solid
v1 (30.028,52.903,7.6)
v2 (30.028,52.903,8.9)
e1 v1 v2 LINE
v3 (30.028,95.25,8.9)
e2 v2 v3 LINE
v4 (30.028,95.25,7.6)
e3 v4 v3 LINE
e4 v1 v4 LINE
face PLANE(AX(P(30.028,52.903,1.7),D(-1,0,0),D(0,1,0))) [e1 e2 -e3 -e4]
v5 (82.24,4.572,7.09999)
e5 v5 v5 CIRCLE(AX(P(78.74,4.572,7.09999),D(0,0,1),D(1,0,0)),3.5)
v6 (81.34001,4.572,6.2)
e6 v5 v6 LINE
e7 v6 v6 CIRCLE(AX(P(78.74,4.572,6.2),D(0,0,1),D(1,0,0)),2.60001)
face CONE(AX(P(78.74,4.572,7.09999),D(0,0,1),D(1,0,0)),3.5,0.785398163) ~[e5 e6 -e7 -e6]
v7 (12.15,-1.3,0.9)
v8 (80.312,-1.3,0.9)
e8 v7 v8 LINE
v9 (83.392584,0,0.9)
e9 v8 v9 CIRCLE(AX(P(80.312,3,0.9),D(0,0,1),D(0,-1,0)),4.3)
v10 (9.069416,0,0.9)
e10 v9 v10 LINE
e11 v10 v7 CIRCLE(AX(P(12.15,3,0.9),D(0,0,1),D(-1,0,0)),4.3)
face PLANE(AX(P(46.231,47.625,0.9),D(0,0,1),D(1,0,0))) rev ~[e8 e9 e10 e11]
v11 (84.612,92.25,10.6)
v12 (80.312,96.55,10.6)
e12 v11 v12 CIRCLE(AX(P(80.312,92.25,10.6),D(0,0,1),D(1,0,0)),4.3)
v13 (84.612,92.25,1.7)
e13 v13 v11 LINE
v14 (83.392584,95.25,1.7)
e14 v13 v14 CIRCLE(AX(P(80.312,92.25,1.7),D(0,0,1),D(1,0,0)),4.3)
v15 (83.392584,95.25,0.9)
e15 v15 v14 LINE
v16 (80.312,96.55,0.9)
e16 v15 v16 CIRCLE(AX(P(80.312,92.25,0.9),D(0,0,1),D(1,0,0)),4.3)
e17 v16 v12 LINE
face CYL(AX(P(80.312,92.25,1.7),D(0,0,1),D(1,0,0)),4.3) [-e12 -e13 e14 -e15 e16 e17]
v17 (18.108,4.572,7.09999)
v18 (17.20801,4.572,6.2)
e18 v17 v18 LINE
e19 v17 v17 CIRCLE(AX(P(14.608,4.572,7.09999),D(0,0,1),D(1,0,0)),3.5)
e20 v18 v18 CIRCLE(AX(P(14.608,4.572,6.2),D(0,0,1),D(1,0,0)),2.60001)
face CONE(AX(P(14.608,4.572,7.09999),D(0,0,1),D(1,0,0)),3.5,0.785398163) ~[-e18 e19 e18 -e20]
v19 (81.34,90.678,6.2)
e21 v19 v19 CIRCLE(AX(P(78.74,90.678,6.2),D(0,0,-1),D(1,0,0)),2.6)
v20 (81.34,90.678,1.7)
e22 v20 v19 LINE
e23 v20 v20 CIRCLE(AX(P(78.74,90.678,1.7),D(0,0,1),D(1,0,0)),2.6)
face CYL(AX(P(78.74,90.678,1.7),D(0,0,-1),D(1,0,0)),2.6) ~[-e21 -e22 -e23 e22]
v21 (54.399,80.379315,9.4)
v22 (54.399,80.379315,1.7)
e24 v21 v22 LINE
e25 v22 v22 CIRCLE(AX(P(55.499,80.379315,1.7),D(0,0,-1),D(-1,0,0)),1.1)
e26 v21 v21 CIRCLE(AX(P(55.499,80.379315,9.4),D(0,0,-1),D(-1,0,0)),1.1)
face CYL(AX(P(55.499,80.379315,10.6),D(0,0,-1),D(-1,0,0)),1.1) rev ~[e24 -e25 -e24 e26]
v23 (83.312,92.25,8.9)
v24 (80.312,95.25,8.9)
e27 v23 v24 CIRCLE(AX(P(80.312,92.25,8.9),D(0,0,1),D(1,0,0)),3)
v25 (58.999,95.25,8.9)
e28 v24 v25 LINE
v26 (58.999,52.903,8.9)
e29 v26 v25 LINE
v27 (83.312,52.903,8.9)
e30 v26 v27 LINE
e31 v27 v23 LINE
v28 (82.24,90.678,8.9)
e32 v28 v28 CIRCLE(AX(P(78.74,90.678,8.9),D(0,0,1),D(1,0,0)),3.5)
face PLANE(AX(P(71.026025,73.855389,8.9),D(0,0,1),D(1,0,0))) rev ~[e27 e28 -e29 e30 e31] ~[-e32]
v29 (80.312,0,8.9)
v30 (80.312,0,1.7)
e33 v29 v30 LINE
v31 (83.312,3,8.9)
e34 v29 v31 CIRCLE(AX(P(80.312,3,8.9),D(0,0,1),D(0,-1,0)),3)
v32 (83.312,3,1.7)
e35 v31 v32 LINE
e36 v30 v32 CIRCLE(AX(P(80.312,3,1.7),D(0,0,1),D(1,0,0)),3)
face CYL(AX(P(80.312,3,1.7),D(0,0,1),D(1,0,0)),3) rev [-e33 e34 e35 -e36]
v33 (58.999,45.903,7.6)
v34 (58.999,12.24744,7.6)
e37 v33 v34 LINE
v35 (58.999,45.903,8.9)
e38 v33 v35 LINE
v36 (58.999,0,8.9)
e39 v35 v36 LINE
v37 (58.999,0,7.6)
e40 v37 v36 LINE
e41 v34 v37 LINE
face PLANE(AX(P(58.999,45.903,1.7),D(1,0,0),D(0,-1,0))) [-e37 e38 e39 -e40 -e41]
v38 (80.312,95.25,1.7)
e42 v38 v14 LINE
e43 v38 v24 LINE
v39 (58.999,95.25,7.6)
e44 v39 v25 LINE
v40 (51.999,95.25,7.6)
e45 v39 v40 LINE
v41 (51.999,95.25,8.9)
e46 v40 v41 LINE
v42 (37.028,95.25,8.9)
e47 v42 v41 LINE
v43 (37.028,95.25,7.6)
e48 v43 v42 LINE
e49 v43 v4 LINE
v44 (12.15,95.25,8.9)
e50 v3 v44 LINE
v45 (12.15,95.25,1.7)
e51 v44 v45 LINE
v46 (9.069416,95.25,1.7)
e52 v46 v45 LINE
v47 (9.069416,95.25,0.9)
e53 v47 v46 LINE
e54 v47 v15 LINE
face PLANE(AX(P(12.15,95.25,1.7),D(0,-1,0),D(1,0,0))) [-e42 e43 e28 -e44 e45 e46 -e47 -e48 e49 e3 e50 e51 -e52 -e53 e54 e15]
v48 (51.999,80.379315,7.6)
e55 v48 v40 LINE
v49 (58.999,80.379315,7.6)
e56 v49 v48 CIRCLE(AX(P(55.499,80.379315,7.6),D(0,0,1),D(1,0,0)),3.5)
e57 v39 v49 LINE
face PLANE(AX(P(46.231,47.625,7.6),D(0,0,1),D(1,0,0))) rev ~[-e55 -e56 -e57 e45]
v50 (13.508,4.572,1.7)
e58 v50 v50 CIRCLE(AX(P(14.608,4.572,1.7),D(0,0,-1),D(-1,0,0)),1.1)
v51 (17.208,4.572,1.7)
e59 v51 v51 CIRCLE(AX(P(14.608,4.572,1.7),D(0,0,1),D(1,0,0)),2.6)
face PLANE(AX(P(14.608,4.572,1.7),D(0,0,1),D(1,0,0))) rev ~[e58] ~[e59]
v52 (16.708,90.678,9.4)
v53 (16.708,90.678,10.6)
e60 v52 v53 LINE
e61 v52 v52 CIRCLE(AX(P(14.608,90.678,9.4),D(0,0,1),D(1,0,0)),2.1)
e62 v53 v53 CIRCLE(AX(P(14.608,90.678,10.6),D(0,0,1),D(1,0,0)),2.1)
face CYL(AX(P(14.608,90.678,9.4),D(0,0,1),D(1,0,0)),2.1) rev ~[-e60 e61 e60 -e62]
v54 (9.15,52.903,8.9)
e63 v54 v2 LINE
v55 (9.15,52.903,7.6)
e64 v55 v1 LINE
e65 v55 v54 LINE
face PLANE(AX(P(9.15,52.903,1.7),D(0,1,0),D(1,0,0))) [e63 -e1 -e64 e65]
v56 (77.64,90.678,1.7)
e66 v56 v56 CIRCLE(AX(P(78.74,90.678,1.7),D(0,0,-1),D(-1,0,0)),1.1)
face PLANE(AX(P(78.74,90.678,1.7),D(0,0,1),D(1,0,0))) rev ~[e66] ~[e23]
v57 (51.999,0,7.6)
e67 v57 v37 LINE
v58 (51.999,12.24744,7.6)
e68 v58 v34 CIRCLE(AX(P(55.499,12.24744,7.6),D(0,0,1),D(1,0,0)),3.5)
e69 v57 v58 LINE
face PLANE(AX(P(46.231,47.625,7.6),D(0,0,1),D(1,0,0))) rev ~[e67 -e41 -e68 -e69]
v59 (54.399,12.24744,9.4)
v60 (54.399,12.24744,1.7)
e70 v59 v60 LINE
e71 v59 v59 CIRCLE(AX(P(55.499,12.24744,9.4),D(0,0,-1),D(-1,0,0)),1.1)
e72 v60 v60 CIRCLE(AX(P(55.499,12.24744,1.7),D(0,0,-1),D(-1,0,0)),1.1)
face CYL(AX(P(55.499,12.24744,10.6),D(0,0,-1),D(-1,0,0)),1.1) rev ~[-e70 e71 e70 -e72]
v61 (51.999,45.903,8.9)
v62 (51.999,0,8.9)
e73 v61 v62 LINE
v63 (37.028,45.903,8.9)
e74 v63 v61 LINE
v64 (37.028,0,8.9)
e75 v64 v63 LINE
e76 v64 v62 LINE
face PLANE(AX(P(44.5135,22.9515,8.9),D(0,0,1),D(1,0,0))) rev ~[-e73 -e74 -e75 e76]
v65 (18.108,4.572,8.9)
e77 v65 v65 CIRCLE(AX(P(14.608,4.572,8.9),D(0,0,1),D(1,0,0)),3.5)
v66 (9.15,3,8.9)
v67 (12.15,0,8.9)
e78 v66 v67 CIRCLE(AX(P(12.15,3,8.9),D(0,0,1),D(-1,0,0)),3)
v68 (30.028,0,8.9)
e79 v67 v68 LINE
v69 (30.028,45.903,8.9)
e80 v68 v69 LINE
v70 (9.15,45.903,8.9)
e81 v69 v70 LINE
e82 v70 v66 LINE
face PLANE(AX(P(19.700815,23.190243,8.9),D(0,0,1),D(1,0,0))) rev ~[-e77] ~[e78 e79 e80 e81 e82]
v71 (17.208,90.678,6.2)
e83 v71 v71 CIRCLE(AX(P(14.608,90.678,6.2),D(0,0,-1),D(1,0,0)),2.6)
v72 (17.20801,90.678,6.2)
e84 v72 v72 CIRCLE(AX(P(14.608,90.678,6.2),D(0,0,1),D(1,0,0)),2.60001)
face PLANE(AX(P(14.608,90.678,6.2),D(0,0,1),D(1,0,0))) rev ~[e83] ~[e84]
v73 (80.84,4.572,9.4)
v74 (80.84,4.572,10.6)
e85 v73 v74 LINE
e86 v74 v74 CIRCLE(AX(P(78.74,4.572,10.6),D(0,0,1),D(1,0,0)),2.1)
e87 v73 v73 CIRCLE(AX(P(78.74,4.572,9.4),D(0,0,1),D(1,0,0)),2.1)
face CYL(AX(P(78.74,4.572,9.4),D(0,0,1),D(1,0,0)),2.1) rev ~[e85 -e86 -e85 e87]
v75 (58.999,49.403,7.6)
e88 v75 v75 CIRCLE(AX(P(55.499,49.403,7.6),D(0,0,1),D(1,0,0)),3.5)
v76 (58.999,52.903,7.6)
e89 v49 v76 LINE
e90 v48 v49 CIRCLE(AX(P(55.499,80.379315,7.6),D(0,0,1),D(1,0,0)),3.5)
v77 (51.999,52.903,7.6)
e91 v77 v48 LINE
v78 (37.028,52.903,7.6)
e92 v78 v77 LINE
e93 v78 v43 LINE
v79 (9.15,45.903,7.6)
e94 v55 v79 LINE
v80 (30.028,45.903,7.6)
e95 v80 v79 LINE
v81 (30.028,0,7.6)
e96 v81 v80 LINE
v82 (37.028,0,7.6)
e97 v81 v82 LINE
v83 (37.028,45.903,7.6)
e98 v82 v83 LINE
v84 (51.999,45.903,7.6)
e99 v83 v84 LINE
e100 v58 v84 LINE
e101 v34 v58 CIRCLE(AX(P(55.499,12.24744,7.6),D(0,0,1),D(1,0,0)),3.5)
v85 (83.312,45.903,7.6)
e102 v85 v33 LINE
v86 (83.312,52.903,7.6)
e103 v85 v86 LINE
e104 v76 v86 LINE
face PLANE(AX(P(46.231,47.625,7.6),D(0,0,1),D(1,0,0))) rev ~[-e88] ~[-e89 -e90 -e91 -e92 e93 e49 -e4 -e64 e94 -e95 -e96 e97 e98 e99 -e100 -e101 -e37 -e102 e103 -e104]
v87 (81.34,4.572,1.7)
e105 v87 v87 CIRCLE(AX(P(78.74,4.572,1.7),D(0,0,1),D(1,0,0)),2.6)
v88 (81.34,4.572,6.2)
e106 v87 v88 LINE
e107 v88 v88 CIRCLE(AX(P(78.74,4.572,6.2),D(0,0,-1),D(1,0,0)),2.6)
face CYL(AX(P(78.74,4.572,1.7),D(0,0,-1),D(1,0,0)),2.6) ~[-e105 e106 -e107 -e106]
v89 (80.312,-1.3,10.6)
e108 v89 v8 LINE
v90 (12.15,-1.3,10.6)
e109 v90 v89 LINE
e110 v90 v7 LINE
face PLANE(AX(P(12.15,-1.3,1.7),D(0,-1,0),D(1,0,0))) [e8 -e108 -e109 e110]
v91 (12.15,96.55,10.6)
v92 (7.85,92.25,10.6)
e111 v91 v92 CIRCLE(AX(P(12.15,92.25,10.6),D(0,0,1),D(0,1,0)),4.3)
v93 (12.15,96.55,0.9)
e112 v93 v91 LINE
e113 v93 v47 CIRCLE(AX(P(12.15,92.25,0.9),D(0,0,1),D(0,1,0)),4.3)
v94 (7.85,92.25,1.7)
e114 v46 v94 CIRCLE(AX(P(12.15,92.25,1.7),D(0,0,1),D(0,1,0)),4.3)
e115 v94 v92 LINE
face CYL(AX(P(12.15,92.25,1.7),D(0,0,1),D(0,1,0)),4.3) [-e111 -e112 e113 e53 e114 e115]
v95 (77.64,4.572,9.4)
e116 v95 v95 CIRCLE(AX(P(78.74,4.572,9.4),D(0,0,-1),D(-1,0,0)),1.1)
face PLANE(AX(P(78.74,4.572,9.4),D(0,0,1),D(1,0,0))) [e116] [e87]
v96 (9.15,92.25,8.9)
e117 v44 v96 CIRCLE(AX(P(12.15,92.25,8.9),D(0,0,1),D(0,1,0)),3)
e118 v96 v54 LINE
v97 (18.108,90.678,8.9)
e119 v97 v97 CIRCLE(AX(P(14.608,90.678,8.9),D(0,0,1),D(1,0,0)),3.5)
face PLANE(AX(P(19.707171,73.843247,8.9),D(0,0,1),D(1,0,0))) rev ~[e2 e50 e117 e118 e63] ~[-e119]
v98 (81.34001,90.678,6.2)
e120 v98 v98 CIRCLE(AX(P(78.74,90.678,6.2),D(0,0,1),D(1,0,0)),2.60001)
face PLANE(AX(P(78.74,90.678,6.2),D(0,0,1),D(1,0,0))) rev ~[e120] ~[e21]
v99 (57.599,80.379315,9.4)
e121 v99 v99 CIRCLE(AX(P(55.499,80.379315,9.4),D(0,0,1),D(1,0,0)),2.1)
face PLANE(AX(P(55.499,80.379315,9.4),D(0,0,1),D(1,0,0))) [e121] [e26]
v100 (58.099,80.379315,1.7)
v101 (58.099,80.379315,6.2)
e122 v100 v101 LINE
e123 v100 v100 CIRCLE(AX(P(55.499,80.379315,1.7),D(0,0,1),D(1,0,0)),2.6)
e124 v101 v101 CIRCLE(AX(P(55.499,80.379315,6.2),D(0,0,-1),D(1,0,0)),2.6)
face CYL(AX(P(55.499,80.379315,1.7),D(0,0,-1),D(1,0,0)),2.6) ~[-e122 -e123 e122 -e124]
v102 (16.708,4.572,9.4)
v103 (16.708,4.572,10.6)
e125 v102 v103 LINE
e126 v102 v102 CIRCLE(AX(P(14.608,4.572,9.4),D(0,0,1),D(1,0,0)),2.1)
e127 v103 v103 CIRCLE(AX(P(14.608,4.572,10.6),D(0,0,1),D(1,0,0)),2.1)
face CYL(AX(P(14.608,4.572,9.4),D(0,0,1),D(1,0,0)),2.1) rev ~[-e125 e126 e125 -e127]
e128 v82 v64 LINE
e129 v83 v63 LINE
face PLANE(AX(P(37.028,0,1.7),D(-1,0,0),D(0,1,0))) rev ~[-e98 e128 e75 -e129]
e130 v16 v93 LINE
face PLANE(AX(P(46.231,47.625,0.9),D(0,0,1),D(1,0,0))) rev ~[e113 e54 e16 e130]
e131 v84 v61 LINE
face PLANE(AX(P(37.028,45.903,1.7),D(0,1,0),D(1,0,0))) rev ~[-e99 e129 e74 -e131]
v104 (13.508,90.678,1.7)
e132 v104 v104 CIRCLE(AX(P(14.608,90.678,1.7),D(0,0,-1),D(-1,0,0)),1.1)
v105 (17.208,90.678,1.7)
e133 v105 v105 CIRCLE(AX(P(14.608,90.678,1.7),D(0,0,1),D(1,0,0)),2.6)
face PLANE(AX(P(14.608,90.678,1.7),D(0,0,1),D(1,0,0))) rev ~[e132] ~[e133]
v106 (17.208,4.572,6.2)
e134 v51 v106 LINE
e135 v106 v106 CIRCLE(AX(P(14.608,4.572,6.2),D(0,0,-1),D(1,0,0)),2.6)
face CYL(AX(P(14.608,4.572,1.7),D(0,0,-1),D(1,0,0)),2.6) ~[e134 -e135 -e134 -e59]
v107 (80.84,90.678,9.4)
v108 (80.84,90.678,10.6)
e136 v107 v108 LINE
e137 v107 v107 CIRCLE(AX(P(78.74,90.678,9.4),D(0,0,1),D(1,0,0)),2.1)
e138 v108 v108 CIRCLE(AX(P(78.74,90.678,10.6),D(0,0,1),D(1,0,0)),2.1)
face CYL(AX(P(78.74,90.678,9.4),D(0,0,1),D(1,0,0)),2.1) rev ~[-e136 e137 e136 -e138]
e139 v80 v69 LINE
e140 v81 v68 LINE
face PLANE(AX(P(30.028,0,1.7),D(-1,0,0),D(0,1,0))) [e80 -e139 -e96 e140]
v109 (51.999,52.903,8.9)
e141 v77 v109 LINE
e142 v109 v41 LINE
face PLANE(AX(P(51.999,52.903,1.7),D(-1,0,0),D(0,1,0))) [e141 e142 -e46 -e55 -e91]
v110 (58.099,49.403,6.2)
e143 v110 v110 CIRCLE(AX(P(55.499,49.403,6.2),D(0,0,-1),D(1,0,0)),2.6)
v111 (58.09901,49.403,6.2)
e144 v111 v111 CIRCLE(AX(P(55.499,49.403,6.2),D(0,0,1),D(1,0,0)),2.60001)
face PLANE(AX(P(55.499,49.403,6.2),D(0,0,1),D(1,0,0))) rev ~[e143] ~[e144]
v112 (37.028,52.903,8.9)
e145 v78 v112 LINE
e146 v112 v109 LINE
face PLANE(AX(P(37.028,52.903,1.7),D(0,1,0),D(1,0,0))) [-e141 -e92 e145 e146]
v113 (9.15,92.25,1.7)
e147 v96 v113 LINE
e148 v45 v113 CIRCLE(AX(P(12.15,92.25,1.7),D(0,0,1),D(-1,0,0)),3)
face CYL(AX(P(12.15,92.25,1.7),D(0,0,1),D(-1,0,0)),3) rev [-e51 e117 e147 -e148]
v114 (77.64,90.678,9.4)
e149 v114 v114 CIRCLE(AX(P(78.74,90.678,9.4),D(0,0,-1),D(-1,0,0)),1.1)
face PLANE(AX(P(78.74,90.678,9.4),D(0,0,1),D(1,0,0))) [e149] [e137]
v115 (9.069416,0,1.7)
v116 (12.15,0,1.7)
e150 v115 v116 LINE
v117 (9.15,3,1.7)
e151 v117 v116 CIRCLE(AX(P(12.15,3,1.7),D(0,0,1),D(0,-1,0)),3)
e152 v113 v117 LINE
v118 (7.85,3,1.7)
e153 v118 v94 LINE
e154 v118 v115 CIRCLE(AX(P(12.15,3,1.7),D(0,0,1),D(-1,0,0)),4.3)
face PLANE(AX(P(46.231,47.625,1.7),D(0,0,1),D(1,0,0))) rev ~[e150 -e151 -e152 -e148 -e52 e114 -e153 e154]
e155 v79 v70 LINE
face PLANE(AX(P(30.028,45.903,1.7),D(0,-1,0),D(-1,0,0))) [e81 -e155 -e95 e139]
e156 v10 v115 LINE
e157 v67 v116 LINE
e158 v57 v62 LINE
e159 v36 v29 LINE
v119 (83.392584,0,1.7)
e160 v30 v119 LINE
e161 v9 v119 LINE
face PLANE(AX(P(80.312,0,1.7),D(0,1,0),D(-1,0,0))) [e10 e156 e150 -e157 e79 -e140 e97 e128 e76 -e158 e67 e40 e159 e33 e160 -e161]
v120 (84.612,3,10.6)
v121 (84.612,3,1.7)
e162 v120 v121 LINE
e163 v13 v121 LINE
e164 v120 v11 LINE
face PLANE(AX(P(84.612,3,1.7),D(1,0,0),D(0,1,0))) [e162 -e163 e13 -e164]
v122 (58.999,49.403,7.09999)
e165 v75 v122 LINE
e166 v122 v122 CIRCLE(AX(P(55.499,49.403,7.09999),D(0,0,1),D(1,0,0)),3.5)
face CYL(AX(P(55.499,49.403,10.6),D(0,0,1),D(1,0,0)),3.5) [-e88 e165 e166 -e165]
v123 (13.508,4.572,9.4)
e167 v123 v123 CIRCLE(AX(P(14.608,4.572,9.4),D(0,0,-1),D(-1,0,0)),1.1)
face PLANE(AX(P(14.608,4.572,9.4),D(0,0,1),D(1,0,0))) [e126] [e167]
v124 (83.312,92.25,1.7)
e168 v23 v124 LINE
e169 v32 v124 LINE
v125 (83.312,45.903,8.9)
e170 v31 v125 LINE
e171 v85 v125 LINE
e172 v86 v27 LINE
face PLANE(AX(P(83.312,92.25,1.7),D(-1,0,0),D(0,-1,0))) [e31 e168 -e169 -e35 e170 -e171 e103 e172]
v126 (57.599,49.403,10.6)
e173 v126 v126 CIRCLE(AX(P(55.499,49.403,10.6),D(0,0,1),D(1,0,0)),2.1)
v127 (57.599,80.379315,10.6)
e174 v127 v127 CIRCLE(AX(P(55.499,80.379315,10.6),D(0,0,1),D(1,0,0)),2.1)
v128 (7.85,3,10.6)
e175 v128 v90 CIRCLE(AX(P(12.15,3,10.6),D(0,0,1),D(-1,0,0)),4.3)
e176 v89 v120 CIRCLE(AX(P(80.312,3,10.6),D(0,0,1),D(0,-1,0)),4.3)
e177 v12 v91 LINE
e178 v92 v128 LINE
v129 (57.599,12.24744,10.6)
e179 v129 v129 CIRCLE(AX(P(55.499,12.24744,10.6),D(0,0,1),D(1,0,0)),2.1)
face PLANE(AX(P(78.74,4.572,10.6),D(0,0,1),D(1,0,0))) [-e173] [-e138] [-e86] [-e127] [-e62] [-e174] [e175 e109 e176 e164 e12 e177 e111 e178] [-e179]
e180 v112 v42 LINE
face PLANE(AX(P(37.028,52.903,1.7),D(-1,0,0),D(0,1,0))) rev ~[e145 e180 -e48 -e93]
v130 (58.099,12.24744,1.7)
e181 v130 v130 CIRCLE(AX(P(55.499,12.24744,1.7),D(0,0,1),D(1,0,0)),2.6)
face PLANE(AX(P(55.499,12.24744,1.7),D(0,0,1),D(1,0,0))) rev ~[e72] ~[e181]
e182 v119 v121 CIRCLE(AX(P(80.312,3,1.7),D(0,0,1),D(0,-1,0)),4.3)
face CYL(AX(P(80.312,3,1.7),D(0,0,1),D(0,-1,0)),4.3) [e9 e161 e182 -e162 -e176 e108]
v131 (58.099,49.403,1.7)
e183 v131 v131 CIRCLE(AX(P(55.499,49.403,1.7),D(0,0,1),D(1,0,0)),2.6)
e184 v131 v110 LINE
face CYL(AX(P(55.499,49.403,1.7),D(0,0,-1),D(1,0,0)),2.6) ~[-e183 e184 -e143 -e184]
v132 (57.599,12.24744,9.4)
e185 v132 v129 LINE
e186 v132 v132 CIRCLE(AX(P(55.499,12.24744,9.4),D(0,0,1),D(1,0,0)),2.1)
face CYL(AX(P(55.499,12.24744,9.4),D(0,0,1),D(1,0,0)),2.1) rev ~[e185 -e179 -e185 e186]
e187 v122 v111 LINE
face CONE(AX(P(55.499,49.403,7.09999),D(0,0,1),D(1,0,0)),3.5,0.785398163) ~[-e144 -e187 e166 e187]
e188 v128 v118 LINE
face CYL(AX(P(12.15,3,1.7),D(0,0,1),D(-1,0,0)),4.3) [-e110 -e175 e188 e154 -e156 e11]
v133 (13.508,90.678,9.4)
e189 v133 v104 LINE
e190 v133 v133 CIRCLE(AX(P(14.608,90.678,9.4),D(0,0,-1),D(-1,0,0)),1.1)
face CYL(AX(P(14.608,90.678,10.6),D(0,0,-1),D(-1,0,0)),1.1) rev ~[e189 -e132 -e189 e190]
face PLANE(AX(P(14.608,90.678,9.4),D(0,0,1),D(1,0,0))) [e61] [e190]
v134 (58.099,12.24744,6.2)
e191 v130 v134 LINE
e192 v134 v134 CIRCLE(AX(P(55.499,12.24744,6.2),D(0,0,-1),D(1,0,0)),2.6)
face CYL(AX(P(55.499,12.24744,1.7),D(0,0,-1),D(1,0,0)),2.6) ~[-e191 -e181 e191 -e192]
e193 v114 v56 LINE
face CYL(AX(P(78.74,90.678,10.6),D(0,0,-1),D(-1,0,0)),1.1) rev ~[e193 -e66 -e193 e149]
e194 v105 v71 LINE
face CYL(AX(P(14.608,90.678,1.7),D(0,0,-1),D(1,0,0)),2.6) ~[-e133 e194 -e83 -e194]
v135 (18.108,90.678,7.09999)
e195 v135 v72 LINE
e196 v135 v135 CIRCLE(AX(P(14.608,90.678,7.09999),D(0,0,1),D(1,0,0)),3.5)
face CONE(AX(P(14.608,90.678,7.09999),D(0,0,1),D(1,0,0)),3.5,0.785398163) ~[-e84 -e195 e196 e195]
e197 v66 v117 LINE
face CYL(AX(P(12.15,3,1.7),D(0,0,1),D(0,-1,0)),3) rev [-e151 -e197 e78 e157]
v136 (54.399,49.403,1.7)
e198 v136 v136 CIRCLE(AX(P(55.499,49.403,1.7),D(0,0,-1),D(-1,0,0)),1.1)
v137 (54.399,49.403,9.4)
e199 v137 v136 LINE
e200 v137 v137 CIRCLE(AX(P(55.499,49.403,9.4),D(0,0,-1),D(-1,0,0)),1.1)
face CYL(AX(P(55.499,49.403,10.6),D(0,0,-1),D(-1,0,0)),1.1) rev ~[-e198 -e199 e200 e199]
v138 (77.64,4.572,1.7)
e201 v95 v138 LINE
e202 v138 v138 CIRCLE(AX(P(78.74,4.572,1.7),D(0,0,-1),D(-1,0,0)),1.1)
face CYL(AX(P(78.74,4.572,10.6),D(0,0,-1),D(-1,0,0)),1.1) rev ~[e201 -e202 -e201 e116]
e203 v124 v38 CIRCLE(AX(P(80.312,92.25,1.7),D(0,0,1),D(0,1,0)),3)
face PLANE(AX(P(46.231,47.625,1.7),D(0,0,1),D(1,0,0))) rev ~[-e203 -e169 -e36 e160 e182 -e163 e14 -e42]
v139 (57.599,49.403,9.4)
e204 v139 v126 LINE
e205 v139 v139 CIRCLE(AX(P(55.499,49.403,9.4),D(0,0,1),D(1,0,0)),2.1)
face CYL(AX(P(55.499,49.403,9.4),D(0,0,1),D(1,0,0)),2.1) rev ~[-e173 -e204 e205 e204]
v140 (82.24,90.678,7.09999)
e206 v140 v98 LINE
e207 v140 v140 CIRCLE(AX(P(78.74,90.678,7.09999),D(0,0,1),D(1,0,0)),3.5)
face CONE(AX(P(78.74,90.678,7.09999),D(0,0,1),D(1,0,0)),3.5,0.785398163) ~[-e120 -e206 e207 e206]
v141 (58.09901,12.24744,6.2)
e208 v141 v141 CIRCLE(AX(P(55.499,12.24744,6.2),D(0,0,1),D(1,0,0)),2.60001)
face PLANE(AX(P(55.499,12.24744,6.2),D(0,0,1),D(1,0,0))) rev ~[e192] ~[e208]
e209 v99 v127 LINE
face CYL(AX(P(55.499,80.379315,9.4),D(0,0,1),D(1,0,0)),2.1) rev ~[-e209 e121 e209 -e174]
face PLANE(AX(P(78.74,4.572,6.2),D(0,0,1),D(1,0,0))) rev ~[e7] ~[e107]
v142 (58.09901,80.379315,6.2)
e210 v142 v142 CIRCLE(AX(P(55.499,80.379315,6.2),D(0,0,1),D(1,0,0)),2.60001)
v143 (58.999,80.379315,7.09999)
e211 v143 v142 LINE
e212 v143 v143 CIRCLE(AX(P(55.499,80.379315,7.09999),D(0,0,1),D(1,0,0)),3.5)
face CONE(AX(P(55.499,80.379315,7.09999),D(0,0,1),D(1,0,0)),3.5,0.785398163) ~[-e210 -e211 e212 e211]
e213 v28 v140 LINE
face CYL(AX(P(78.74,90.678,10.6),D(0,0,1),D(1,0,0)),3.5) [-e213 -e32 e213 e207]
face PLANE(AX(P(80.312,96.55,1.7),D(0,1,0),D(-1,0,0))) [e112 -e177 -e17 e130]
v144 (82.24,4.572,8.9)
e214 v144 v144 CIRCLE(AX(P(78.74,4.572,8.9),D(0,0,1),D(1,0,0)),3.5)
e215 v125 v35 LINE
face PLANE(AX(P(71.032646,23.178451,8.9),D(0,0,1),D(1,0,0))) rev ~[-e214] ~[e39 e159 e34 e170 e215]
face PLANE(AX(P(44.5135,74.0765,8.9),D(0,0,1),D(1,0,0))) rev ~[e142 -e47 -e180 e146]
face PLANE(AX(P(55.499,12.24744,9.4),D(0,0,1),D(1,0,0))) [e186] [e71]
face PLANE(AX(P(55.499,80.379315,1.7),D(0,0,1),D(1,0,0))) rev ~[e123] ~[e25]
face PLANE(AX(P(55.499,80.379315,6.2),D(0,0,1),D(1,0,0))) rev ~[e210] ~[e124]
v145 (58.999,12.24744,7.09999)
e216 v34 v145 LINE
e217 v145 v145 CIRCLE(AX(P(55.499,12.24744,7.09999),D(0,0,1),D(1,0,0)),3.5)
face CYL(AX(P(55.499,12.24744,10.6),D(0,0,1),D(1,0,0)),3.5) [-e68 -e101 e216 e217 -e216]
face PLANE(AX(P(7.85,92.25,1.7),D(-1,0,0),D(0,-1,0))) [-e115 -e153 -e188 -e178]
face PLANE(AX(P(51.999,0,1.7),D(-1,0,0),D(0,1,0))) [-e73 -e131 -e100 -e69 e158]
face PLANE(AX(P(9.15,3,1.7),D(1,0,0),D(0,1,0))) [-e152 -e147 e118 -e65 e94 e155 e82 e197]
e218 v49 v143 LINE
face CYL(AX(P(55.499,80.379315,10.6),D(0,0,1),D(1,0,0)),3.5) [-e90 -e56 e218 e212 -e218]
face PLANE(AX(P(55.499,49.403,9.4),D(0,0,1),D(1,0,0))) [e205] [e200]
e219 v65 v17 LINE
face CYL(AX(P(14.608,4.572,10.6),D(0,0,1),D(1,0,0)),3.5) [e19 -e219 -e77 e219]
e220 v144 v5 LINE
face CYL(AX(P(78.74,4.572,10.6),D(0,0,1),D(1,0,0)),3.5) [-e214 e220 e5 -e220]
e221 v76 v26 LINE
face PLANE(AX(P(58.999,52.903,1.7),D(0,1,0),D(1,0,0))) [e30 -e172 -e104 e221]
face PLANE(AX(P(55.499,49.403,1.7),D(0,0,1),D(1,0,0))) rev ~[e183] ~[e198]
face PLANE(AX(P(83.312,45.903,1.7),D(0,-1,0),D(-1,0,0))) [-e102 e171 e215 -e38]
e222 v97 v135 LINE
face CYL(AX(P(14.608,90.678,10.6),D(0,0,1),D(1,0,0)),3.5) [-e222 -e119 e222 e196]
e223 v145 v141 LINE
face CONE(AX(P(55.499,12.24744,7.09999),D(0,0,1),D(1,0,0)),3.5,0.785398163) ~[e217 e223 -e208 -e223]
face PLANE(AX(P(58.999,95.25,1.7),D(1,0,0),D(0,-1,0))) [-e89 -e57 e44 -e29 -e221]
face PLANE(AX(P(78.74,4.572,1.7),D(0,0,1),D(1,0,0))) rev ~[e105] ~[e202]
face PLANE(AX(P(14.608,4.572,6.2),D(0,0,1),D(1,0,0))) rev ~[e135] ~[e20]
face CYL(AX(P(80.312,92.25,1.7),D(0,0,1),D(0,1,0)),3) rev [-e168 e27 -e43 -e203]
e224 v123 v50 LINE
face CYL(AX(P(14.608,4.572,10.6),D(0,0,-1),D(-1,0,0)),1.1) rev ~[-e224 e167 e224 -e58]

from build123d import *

# Parameters (mm, degrees)
F7_DEPTH        = 8.9
F9_DEPTH        = 0.8
F11_W           = 14.971
F11_H           = 45.903
F11_H_2         = 42.347
F13_DEPTH       = 7.1999999775
F14_DEPTH       = 5.9
F10_R           = 2.6
F16_R           = 3.5
F18_DEPTH       = 4.4
F19_SIZE        = 0.89999
F20_D           = 2.2
F20_CBORE_D     = 4.2
F20_CBORE_DEPTH = 1.2
F21_W           = 84.162
F21_H           = 95.25
F22_DEPTH       = 0.801


# Not quite as in the source:
# - a fillet or chamfer is up to 0.001 mm smaller than in the source, because OpenCascade refuses the exact size


with BuildPart() as f7:
    # F4 (on offset) → F7 (new body, through all)
    with BuildSketch(Plane.XY.offset(1.7)):
        with BuildLine():
            Line((84.612, 3), (84.612, 92.25))
            ThreePointArc((84.612, 92.25), (83.3525591591, 95.2905591591), (80.312, 96.55))
            Line((80.312, 96.55), (12.15, 96.55))
            ThreePointArc((12.15, 96.55), (9.1094408409, 95.2905591591), (7.85, 92.25))
            Line((7.85, 92.25), (7.85, 3))
            ThreePointArc((7.85, 3), (9.1094408409, -0.0405591591), (12.15, -1.3))
            Line((12.15, -1.3), (80.312, -1.3))
            ThreePointArc((80.312, -1.3), (83.3525591591, -0.0405591591), (84.612, 3))
        make_face()
    extrude(amount=F7_DEPTH)

    # F8 (on offset) → F9 (join)
    with BuildSketch(Plane.XY.offset(1.7)):
        with BuildLine():
            Line((84.612, 3), (84.612, 92.25))
            ThreePointArc((84.612, 92.25), (83.3525591591, 95.2905591591), (80.312, 96.55))
            Line((80.312, 96.55), (12.15, 96.55))
            ThreePointArc((12.15, 96.55), (9.1094408409, 95.2905591591), (7.85, 92.25))
            Line((7.85, 92.25), (7.85, 3))
            ThreePointArc((7.85, 3), (9.1094408409, -0.0405591591), (12.15, -1.3))
            Line((12.15, -1.3), (80.312, -1.3))
            ThreePointArc((80.312, -1.3), (83.3525591591, -0.0405591591), (84.612, 3))
        make_face()
        with BuildLine():
            ThreePointArc((80.312, 95.25), (82.4333203436, 94.3713203436), (83.312, 92.25))
            Line((83.312, 92.25), (83.312, 3))
            ThreePointArc((83.312, 3), (82.4333203436, 0.8786796564), (80.312, 0))
            Line((80.312, 0), (12.15, 0))
            ThreePointArc((12.15, 0), (10.0286796564, 0.8786796564), (9.15, 3))
            Line((9.15, 3), (9.15, 92.25))
            ThreePointArc((9.15, 92.25), (10.0286796564, 94.3713203436), (12.15, 95.25))
            Line((12.15, 95.25), (80.312, 95.25))
        make_face(mode=Mode.SUBTRACT)
    extrude(amount=-F9_DEPTH)

    # F11 (on offset) → F13 (cut, through all)
    with BuildSketch(Plane.XY.offset(1.7)):
        with BuildLine():
            Line((58.999, 0), (80.312, 0))
            ThreePointArc((80.312, 0), (82.4333203436, 0.8786796564), (83.312, 3))
            Line((83.312, 3), (83.312, 45.903))
            Line((83.312, 45.903), (58.999, 45.903))
            Line((58.999, 45.903), (58.999, 0))
        make_face()
        with Locations((44.5135, 22.9515)):
            Rectangle(F11_W, F11_H)
        with BuildLine():
            Line((9.15, 45.903), (9.15, 3))
            ThreePointArc((9.15, 3), (10.0286796564, 0.8786796564), (12.15, 0))
            Line((12.15, 0), (30.028, 0))
            Line((30.028, 0), (30.028, 45.903))
            Line((30.028, 45.903), (9.15, 45.903))
        make_face()
        with Locations((44.5135, 74.0765)):
            Rectangle(F11_W, F11_H_2)
        with BuildLine():
            Line((80.312, 95.25), (58.999, 95.25))
            Line((58.999, 95.25), (58.999, 52.903))
            Line((58.999, 52.903), (83.312, 52.903))
            Line((83.312, 52.903), (83.312, 92.25))
            ThreePointArc((83.312, 92.25), (82.4333203436, 94.3713203436), (80.312, 95.25))
        make_face()
        with BuildLine():
            ThreePointArc((12.15, 95.25), (10.0286796564, 94.3713203436), (9.15, 92.25))
            Line((9.15, 92.25), (9.15, 52.903))
            Line((9.15, 52.903), (30.028, 52.903))
            Line((30.028, 52.903), (30.028, 95.25))
            Line((30.028, 95.25), (12.15, 95.25))
        make_face()
    extrude(amount=F13_DEPTH, mode=Mode.SUBTRACT)

    # F8 (on offset) → F14 (cut, through all)
    with BuildSketch(Plane.XY.offset(1.7)):
        with BuildLine():
            Line((83.312, 3), (83.312, 92.25))
            ThreePointArc((83.312, 92.25), (82.4333203436, 94.3713203436), (80.312, 95.25))
            Line((80.312, 95.25), (12.15, 95.25))
            ThreePointArc((12.15, 95.25), (10.0286796564, 94.3713203436), (9.15, 92.25))
            Line((9.15, 92.25), (9.15, 3))
            ThreePointArc((9.15, 3), (10.0286796564, 0.8786796564), (12.15, 0))
            Line((12.15, 0), (80.312, 0))
            ThreePointArc((80.312, 0), (82.4333203436, 0.8786796564), (83.312, 3))
        make_face()
    extrude(amount=F14_DEPTH, mode=Mode.SUBTRACT)

    # F10 (on offset) → F15 (join, up to the next surface of F7)
    with BuildSketch(Plane.XY.offset(1.7)):
        with Locations((78.74, 90.678)):
            Circle(F10_R)
        with Locations((55.499, 80.3793147206)):
            Circle(F10_R)
        with Locations((14.608, 90.678)):
            Circle(F10_R)
        with Locations((55.499, 49.403)):
            Circle(F10_R)
        with Locations((14.608, 4.572)):
            Circle(F10_R)
        with Locations((55.499, 12.2474404052)):
            Circle(F10_R)
        with Locations((78.74, 4.572)):
            Circle(F10_R)
    extrude(until=Until.NEXT)

    # F16 (on offset) → F18 (join, through all)
    with BuildSketch(Plane.XY.offset(10.6)):
        with Locations((78.74, 4.572)):
            Circle(F16_R)
        with Locations((78.74, 90.678)):
            Circle(F16_R)
        with Locations((55.499, 80.3793147206)):
            Circle(F16_R)
        with Locations((55.499, 12.2474404052)):
            Circle(F16_R)
        with Locations((14.608, 90.678)):
            Circle(F16_R)
        with Locations((14.608, 4.572)):
            Circle(F16_R)
        with Locations((55.499, 49.403)):
            Circle(F16_R)
    extrude(amount=-F18_DEPTH)

    # F19 (size 0.9 in the source; OpenCascade refuses exactly that, so slightly less here)
    f19_edges = [f7.edges().sort_by_distance(p)[0] for p in [
        (75.24, 90.678, 6.2),
        (51.999, 80.379315, 6.2),
        (11.108, 90.678, 6.2),
        (51.999, 49.403, 6.2),
        (51.999, 12.24744, 6.2),
        (75.24, 4.572, 6.2),
        (11.108, 4.572, 6.2),
    ]]
    chamfer(f19_edges, length=F19_SIZE)

    # F20 (through all)
    with Locations(Plane.XY.offset(10.6)):
        with Locations((78.74, 90.678), (55.499, 80.3793147206), (55.499, 49.403), (14.608, 90.678), (55.499, 12.2474404052), (78.74, 4.572), (14.608, 4.572)):
            CounterBoreHole(F20_D / 2, F20_CBORE_D / 2, F20_CBORE_DEPTH)

    # F21 (on offset) → F22 (cut, through all)
    with BuildSketch(Plane.XY.offset(1.7)):
        with Locations((46.231, 47.625)):
            Rectangle(F21_W, F21_H)
    extrude(amount=-F22_DEPTH, mode=Mode.SUBTRACT)


solid = f7.part
